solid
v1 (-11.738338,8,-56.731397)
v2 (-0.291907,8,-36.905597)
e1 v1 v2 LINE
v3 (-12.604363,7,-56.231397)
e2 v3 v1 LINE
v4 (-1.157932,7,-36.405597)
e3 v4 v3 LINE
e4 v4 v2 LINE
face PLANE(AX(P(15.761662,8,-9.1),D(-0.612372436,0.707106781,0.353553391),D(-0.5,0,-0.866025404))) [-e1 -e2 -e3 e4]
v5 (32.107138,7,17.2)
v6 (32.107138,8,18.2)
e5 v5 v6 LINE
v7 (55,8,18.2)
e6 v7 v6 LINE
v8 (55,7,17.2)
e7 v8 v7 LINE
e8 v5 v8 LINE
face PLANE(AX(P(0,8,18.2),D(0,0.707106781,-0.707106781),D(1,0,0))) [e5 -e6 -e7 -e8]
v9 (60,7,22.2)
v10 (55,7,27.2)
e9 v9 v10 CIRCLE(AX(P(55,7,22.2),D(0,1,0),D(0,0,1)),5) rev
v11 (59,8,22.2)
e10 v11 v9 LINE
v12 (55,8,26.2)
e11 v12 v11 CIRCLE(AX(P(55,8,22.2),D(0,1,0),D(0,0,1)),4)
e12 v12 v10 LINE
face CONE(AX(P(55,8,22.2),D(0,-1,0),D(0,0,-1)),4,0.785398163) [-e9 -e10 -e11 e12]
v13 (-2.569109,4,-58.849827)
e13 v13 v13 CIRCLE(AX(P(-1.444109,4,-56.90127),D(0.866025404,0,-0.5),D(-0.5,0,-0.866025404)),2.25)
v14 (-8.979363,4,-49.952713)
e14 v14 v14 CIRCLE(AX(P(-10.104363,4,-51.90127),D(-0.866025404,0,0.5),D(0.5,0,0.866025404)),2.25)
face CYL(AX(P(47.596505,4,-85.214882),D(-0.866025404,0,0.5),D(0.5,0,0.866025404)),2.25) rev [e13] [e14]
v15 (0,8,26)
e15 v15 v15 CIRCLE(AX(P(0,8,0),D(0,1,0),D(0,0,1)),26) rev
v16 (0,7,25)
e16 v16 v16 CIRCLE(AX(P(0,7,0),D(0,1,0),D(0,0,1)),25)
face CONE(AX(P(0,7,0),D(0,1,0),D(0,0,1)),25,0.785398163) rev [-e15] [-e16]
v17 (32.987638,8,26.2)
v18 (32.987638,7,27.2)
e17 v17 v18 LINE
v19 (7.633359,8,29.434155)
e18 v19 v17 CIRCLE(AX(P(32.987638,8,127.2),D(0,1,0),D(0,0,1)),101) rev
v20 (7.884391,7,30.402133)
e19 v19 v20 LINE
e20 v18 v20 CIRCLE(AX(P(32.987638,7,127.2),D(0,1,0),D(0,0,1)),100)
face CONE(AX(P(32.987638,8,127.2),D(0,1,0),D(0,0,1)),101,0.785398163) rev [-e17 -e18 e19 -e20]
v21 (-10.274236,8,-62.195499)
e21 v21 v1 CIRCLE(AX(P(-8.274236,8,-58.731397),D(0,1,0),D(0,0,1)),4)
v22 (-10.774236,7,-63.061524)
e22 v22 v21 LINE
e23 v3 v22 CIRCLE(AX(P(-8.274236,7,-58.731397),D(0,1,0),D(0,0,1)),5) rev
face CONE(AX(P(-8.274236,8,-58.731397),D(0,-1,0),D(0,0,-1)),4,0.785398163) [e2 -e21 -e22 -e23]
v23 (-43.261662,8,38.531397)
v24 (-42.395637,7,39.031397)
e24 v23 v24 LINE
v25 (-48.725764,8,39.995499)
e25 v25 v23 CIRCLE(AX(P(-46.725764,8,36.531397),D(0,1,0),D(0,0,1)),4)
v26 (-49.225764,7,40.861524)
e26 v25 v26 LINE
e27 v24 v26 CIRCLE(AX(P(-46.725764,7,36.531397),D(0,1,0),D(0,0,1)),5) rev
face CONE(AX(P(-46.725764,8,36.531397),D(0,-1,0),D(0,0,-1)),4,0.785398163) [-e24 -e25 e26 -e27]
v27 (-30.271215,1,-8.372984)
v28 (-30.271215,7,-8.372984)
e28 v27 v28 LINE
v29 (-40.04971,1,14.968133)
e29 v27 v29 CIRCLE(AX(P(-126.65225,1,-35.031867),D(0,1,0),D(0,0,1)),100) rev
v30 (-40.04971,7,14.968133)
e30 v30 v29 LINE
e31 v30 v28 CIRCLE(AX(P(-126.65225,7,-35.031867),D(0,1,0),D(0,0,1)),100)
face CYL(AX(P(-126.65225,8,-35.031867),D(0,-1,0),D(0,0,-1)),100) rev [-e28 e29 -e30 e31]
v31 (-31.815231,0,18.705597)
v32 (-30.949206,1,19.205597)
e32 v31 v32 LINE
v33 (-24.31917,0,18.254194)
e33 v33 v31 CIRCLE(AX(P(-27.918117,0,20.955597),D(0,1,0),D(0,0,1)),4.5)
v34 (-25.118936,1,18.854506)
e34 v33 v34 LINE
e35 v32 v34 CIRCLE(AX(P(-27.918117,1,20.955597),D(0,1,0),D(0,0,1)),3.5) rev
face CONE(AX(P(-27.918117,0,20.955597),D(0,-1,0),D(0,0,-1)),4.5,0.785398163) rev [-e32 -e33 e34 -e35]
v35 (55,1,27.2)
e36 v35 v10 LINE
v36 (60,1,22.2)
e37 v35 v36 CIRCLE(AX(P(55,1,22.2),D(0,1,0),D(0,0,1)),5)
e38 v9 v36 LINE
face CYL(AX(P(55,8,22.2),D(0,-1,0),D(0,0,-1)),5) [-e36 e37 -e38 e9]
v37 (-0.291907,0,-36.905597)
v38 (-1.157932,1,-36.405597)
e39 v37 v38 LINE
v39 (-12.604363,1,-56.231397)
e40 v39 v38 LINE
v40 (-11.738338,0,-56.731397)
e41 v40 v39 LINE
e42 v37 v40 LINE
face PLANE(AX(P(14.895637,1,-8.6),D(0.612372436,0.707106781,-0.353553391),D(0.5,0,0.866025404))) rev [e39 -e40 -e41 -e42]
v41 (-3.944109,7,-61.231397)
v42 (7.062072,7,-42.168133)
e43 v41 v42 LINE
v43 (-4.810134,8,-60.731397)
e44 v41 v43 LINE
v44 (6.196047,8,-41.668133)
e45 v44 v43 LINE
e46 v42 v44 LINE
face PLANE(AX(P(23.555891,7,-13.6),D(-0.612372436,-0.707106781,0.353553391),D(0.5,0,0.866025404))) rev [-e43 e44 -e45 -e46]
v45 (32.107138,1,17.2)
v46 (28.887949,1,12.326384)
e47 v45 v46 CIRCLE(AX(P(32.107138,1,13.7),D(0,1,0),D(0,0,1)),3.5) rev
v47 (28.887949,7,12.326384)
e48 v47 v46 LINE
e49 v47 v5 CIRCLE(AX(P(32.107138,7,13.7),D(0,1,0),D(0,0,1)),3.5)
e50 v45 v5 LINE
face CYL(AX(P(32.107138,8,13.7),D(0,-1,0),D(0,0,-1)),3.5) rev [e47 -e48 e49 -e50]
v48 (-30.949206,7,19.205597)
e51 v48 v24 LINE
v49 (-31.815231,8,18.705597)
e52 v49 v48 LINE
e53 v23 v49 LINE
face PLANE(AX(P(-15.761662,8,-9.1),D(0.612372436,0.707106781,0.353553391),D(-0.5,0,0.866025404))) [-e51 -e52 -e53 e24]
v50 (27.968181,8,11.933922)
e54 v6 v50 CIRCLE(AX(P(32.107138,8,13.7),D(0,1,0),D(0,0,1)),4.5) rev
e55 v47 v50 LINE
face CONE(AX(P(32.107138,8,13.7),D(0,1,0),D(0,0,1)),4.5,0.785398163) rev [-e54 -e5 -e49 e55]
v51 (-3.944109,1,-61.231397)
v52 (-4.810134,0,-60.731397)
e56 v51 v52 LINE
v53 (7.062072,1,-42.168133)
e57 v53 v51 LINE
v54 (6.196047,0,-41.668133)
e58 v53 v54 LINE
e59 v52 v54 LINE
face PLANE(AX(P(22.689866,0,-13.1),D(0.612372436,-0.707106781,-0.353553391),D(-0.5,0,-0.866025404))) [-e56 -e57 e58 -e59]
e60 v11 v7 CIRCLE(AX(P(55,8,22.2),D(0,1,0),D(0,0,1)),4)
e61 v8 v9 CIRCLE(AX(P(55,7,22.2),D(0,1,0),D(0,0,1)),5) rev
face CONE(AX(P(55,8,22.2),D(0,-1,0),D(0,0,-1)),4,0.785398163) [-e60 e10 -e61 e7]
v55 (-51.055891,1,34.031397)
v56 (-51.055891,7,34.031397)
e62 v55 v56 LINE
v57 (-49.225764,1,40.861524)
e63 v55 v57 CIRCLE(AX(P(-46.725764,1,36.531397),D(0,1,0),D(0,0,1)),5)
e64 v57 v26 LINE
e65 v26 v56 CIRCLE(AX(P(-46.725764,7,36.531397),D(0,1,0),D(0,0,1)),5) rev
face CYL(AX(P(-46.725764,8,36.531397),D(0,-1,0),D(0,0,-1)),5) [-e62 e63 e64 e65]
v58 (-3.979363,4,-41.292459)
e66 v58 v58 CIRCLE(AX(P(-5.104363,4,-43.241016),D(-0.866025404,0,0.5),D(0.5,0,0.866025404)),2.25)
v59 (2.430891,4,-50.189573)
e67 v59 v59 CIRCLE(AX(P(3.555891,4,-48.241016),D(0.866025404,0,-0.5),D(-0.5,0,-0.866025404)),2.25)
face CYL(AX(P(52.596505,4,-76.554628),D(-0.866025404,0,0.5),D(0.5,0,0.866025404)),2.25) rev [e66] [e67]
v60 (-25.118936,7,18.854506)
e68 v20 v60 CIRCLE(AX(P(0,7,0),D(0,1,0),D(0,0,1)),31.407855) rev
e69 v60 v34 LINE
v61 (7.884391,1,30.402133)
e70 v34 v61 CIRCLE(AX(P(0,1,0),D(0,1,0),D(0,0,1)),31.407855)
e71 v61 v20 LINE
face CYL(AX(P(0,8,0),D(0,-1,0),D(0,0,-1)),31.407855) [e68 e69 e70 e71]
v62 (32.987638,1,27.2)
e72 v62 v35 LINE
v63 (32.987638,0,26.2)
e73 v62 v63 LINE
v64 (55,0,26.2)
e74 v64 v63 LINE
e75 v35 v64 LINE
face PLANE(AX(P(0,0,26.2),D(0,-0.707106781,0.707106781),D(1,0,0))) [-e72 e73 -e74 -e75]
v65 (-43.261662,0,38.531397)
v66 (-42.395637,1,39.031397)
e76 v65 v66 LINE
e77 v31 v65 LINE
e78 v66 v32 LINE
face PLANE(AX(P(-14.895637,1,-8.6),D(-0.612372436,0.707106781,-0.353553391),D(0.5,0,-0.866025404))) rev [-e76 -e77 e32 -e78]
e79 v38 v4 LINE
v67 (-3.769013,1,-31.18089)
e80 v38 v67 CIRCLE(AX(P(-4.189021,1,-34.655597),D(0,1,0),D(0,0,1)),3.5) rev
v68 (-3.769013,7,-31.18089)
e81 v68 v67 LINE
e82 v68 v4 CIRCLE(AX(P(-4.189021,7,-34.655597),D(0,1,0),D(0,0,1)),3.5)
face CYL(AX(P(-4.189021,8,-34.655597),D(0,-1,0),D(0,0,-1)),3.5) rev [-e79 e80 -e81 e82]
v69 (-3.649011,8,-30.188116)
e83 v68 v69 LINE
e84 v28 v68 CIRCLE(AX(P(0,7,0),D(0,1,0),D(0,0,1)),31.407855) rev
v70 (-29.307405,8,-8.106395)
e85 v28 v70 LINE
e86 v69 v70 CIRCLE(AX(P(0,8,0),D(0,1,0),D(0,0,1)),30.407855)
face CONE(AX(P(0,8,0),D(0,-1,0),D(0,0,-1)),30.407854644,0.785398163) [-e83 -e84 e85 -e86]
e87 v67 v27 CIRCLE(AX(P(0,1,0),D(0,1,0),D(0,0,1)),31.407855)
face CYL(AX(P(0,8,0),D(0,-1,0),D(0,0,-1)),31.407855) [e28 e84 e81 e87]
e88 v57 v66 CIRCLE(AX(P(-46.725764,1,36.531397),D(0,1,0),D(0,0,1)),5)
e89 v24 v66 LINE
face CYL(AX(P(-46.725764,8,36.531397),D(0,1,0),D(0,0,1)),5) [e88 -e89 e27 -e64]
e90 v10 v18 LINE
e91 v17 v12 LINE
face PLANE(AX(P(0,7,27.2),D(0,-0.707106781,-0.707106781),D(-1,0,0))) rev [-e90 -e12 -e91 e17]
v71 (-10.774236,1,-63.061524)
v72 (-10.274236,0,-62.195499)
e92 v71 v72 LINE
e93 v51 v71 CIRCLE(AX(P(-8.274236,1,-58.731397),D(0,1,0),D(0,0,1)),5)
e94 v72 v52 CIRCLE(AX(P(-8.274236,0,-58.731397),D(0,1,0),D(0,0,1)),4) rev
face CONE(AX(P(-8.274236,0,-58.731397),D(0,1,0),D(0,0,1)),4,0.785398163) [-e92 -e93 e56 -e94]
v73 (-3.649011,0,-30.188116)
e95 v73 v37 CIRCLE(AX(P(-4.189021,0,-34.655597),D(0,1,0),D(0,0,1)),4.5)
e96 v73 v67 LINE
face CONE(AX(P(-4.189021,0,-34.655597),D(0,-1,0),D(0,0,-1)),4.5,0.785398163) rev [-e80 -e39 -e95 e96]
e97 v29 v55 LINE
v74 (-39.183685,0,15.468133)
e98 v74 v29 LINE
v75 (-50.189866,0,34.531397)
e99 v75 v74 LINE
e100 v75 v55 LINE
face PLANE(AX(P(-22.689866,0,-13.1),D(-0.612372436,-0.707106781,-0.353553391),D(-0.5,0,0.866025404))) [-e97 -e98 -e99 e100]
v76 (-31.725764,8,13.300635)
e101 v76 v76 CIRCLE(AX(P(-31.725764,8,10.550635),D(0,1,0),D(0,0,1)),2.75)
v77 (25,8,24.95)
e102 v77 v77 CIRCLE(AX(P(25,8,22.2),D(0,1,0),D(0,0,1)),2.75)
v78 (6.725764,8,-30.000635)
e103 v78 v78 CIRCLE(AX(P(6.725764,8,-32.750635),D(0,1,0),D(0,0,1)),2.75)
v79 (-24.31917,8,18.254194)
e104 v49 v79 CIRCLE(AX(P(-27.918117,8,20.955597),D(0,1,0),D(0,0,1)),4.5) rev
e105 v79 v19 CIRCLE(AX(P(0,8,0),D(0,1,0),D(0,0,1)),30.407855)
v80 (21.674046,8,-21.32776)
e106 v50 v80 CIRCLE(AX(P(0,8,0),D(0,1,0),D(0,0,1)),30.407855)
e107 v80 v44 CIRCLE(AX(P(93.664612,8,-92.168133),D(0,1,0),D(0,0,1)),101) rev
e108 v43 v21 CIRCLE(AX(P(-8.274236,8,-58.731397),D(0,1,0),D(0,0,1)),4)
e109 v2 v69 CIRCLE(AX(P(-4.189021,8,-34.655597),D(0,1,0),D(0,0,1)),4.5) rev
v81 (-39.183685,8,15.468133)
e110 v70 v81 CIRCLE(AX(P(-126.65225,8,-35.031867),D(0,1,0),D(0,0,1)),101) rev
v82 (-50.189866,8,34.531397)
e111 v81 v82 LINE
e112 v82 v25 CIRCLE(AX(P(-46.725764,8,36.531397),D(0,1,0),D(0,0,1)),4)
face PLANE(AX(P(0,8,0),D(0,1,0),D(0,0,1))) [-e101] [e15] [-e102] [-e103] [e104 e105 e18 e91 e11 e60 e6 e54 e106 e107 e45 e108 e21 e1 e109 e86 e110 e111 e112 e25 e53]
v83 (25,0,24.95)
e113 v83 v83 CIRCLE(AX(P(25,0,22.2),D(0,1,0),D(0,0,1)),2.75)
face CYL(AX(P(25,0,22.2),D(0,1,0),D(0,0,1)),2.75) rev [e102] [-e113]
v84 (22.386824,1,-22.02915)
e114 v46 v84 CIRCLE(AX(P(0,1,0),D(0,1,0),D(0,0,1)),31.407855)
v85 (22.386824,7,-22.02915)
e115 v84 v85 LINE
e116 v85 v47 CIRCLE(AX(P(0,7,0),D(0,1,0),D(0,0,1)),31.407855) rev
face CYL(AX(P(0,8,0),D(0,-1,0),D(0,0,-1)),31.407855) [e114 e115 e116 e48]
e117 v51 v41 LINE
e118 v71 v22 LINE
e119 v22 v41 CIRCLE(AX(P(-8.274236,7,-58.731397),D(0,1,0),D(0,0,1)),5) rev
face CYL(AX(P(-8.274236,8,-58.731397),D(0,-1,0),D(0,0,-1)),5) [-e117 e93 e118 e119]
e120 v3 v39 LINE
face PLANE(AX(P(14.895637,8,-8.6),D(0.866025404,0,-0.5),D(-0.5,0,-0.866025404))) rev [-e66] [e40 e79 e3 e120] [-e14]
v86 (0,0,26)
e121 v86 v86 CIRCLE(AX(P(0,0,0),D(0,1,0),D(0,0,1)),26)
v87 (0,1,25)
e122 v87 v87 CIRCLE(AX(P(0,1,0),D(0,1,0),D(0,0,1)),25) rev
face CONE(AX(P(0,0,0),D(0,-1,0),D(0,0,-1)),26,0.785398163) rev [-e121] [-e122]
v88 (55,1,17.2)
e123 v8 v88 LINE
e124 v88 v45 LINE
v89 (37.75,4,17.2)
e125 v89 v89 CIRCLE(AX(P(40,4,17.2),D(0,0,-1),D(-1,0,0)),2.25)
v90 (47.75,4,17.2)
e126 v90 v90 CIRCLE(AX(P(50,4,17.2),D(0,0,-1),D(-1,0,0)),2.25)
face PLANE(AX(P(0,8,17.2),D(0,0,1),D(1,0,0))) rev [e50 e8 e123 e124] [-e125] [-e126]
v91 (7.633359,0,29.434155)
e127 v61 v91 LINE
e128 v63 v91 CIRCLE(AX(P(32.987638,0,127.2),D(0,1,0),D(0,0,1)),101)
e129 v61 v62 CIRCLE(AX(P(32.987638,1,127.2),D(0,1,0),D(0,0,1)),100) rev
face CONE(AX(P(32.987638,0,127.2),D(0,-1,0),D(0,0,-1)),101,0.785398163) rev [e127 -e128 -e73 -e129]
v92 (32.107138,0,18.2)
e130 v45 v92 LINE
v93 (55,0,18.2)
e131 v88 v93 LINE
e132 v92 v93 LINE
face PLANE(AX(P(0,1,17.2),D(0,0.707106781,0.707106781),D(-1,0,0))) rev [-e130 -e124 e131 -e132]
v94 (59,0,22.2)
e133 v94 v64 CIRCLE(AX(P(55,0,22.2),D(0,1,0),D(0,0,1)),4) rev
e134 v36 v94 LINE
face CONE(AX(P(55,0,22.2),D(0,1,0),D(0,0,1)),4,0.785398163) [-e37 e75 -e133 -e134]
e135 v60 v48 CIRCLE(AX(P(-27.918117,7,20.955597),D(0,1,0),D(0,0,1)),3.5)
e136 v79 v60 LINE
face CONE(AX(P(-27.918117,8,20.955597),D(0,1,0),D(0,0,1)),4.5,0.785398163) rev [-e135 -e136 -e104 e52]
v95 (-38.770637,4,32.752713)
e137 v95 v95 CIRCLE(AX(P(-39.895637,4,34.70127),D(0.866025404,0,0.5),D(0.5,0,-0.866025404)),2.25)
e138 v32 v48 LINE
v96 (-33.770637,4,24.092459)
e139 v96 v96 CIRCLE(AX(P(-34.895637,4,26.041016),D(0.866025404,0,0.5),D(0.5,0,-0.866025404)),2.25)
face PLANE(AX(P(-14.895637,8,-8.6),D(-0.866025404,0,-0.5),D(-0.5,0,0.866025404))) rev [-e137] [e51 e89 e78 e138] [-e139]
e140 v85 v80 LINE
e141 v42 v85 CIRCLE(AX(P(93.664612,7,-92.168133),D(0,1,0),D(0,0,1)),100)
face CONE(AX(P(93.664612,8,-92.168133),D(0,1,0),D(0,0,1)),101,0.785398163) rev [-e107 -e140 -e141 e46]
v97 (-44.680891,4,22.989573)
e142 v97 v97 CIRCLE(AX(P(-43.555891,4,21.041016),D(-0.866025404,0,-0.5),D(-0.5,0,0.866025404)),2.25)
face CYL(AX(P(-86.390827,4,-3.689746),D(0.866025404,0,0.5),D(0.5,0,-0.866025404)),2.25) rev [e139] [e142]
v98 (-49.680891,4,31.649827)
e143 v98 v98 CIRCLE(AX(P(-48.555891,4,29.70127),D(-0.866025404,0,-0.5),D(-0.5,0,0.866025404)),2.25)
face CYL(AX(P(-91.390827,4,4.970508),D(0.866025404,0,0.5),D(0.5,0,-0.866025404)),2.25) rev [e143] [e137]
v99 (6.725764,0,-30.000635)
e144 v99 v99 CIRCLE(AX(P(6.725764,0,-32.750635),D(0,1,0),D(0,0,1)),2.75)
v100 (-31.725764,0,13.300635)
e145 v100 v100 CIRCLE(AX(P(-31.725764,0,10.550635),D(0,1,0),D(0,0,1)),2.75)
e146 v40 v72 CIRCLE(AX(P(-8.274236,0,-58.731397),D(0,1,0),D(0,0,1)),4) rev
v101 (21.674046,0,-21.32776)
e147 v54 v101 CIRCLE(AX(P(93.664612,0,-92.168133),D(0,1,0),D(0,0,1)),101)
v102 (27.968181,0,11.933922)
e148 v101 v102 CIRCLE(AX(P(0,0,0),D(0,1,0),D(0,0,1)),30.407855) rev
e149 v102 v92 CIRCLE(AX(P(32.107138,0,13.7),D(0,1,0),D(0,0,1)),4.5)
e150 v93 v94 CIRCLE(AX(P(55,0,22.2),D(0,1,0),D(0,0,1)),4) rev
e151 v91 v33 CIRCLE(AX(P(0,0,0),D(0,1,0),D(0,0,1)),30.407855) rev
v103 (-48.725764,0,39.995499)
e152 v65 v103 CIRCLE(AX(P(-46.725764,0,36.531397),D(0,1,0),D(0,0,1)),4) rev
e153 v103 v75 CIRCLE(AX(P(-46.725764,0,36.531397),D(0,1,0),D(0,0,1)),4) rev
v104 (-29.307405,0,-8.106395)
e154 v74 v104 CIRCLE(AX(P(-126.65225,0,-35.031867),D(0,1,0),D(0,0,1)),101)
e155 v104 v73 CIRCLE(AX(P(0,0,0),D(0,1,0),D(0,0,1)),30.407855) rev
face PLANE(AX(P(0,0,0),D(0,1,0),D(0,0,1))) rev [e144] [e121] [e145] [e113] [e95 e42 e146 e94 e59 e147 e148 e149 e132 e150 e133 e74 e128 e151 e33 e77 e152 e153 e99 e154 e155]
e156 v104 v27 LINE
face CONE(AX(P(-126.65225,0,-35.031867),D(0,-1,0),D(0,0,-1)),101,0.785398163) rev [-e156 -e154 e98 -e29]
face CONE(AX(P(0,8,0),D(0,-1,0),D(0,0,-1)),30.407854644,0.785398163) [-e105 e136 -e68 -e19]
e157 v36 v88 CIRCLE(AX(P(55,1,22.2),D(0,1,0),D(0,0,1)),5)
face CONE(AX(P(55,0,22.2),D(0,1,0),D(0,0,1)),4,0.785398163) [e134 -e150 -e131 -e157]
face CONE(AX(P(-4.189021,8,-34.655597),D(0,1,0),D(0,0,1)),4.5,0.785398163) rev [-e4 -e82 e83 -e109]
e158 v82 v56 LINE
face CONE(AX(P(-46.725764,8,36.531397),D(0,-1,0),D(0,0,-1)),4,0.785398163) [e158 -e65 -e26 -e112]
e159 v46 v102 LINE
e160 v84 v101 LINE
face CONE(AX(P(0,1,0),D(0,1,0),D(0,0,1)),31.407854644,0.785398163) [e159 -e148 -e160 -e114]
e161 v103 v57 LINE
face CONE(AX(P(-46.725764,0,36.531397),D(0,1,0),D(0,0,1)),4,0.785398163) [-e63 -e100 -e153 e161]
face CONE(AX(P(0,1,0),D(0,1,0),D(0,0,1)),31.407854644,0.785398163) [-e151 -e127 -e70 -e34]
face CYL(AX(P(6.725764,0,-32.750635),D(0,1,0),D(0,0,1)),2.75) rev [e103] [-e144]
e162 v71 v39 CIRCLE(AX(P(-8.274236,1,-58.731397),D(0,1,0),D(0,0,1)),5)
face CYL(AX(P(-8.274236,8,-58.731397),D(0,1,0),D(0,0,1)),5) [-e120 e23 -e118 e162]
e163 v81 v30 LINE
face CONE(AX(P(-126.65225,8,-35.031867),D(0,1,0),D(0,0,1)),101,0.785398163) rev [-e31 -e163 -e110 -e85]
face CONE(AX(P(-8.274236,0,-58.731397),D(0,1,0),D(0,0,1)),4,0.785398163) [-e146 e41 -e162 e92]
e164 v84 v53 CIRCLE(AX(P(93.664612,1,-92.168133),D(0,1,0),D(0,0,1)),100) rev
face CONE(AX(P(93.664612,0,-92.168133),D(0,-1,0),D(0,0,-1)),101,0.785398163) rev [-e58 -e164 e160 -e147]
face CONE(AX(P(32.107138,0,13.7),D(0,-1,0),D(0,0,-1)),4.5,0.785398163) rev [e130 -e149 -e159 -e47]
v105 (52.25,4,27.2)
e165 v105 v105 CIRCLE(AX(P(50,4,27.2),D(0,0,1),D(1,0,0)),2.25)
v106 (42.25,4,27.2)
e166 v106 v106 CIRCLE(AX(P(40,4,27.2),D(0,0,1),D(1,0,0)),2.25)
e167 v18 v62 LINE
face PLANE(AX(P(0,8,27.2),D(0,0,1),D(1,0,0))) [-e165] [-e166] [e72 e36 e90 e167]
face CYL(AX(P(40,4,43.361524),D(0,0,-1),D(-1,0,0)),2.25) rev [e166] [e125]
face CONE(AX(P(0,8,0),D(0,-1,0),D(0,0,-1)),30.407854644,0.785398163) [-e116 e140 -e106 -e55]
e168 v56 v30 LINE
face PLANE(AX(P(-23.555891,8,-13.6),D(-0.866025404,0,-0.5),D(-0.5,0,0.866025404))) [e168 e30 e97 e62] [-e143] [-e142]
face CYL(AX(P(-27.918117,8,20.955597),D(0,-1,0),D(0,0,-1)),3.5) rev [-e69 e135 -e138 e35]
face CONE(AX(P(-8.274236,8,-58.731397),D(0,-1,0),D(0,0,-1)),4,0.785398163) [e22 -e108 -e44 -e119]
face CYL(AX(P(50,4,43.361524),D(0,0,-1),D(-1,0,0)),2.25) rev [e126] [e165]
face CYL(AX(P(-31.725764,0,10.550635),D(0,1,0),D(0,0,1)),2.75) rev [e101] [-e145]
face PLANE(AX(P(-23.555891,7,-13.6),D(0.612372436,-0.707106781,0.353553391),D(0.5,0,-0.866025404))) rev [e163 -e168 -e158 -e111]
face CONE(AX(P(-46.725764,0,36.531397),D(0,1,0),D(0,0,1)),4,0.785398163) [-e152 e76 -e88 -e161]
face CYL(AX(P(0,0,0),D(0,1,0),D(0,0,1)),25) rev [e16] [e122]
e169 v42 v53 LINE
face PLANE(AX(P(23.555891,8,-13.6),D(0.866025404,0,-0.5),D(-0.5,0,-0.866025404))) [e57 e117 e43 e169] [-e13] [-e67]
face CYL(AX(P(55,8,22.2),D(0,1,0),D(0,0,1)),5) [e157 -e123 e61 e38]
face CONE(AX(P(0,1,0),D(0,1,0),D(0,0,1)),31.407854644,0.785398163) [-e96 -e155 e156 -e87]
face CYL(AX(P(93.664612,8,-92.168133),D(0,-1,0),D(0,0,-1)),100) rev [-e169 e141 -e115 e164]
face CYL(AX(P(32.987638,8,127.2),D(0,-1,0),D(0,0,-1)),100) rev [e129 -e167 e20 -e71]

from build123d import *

# Parameters (mm, degrees)
BOSS_EXTRUDE1_DEPTH = 8
SKETCH2_R           = 2.25
CUT_EXTRUDE1_DEPTH  = 103.535212939
SKETCH4_R           = 25
SKETCH4_R_2         = 2.75
CUT_EXTRUDE2_DEPTH  = 90.231796233
FILLET1_R           = 5
FILLET2_R           = 100
FILLET3_R           = 3.5
SKETCH5_R           = 2.25
CUT_EXTRUDE3_DEPTH  = 94.342548859
SKETCH6_R           = 2.25
CUT_EXTRUDE4_DEPTH  = 87.844060995
CHAMFER1_SIZE       = 1


with BuildPart() as part:
    # Sketch1 → Boss-Extrude1 (new body)
    with BuildSketch(Plane(origin=(0, 0, 0), x_dir=(1, 0, 0), z_dir=(0, 1, 0))):
        with BuildLine():
            Line((60, -27.2), (60, -17.2))
            Line((60, -17.2), (26.27952308, -17.2))
            ThreePointArc((26.27952308, -17.2), (30.553109939, 7.277417565), (15.703927322, 27.2))
            Line((15.703927322, 27.2), (-6.444109017, 65.561524227))
            Line((-6.444109017, 65.561524227), (-15.104363055, 60.561524227))
            Line((-15.104363055, 60.561524227), (1.755875405, 31.358734587))
            ThreePointArc((1.755875405, 31.358734587), (-21.578983454, 22.821060589), (-31.407854644, 0))
            Line((-31.407854644, 0), (-53.555890983, -38.361524227))
            Line((-53.555890983, -38.361524227), (-44.895636945, -43.361524227))
            Line((-44.895636945, -43.361524227), (-28.035398485, -14.158734587))
            ThreePointArc((-28.035398485, -14.158734587), (-8.974126484, -30.098478154), (15.703927322, -27.2))
            Line((15.703927322, -27.2), (60, -27.2))
        make_face()
    extrude(amount=BOSS_EXTRUDE1_DEPTH)

    # Sketch2 → Cut-Extrude1 (cut, through all)
    with BuildSketch(Plane(origin=(0, 0, 17.2), x_dir=(-1, 0, 0), z_dir=(0, 0, -1))):
        with Locations((-50, 4)):
            Circle(SKETCH2_R)
        with Locations((-40, 4)):
            Circle(SKETCH2_R)
    extrude(amount=-CUT_EXTRUDE1_DEPTH, mode=Mode.SUBTRACT)

    # Sketch4 → Cut-Extrude2 (cut, through all)
    with BuildSketch(Plane(origin=(0, 8, 0), x_dir=(1, 0, 0), z_dir=(0, 1, 0))):
        with Locations(Location((0, 0, 0), (0, 0, 270))):
            Circle(SKETCH4_R)
        with Locations(Location((25, -22.2, 0), (0, 0, 270))):
            Circle(SKETCH4_R_2)
        with Locations(Location((-31.725763964, -10.550635095, 0), (0, 0, 270))):
            Circle(SKETCH4_R_2)
        with Locations(Location((6.725763964, 32.750635095, 0), (0, 0, 270))):
            Circle(SKETCH4_R_2)
    extrude(amount=-CUT_EXTRUDE2_DEPTH, mode=Mode.SUBTRACT)

    # Fillet1
    fillet1_edges = [part.edges().sort_by_distance(p)[0] for p in [
        (-6.444109017, 4, -65.561524227),
        (-15.104363055, 4, -60.561524227),
        (-53.555890983, 4, 38.361524227),
        (-44.895636945, 4, 43.361524227),
        (60, 4, 17.2),
        (60, 4, 27.2),
    ]]
    fillet(fillet1_edges, radius=FILLET1_R - 0.0001)  # a hair under: the kernel refuses the full size

    # Fillet2
    fillet2_edges = [part.edges().sort_by_distance(p)[0] for p in [
        (15.703927322, 4, 27.2),
        (-31.407854644, 4, 0),
        (15.703927322, 4, -27.2),
    ]]
    fillet(fillet2_edges, radius=FILLET2_R)

    # Fillet3
    fillet3_edges = [part.edges().sort_by_distance(p)[0] for p in [
        (26.27952308, 4, 17.2),
        (-28.035398485, 4, 14.158734587),
        (1.755875405, 4, -31.358734587),
    ]]
    fillet(fillet3_edges, radius=FILLET3_R)

    # Sketch5 → Cut-Extrude3 (cut, through all)
    with BuildSketch(Plane(origin=(-14.895636945, 0, -8.6), x_dir=(0.49999999999999967, 0, -0.8660254037844388), z_dir=(0.8660254037844388, 0, 0.49999999999999967))):
        with Locations((-50, 4)):
            Circle(SKETCH5_R)
        with Locations((-40, 4)):
            Circle(SKETCH5_R)
    extrude(amount=-CUT_EXTRUDE3_DEPTH, mode=Mode.SUBTRACT)

    # Sketch6 → Cut-Extrude4 (cut, through all)
    with BuildSketch(Plane(origin=(14.895636945, 0, -8.6), x_dir=(0.5000000000000007, 0, 0.8660254037844384), z_dir=(-0.8660254037844383, 0, 0.5000000000000006))):
        with Locations((-50, 4)):
            Circle(SKETCH6_R)
        with Locations((-40, 4)):
            Circle(SKETCH6_R)
    extrude(amount=-CUT_EXTRUDE4_DEPTH, mode=Mode.SUBTRACT)

    # Chamfer1
    chamfer1_edges = [part.edges().sort_by_distance(p)[0] for p in [
        (14.084814681, 0, -31.611912354),
        (14.084814681, 8, -31.611912354),
        (-34.419126501, 0, 3.608148855),
        (-34.419126501, 8, 3.608148855),
        (20.33431182, 0, 28.003763498),
        (20.33431182, 8, 28.003763498),
        (-20.487421356, 0, -23.805858513),
        (-20.487421356, 8, -23.805858513),
        (-10.372767553, 0, 29.645556608),
        (-10.372767553, 8, 29.645556608),
        (30.860188909, 0, -5.839698096),
        (30.860188909, 8, -5.839698096),
        (-1.058220823, 0, -33.090959821),
        (-1.058220823, 8, -33.090959821),
        (-28.128501429, 0, 17.461926027),
        (-28.128501429, 8, 17.461926027),
        (29.186722253, 0, 15.629033795),
        (29.186722253, 8, 15.629033795),
        (0, 0, -25),
        (0, 8, -25),
        (1.558956478, 0, -51.699808173),
        (43.553619041, 0, 17.2),
        (43.99386901, 0, 27.2),
        (-36.672446466, 0, 29.118540516),
        (-45.552825488, 0, 24.499808173),
        (-6.881172576, 0, -46.318540516),
        (58.535563195, 0, 25.735563195),
        (58.535563195, 0, 18.664436805),
        (-45.431658018, 0, 41.36106635),
        (-51.555433105, 0, 37.825503154),
        (-13.103905177, 0, -60.025503154),
        (-6.98013009, 0, -63.56106635),
        (1.558956478, 8, -51.699808173),
        (-6.881172576, 8, -46.318540516),
        (-45.552825488, 8, 24.499808173),
        (-36.672446466, 8, 29.118540516),
        (43.99386901, 8, 27.2),
        (43.553619041, 8, 17.2),
        (58.535563195, 8, 25.735563195),
        (58.535563195, 8, 18.664436805),
        (-45.431658018, 8, 41.36106635),
        (-51.555433105, 8, 37.825503154),
        (-13.103905177, 8, -60.025503154),
        (-6.98013009, 8, -63.56106635),
    ]]
    chamfer(chamfer1_edges, length=CHAMFER1_SIZE)


solid = part.part
